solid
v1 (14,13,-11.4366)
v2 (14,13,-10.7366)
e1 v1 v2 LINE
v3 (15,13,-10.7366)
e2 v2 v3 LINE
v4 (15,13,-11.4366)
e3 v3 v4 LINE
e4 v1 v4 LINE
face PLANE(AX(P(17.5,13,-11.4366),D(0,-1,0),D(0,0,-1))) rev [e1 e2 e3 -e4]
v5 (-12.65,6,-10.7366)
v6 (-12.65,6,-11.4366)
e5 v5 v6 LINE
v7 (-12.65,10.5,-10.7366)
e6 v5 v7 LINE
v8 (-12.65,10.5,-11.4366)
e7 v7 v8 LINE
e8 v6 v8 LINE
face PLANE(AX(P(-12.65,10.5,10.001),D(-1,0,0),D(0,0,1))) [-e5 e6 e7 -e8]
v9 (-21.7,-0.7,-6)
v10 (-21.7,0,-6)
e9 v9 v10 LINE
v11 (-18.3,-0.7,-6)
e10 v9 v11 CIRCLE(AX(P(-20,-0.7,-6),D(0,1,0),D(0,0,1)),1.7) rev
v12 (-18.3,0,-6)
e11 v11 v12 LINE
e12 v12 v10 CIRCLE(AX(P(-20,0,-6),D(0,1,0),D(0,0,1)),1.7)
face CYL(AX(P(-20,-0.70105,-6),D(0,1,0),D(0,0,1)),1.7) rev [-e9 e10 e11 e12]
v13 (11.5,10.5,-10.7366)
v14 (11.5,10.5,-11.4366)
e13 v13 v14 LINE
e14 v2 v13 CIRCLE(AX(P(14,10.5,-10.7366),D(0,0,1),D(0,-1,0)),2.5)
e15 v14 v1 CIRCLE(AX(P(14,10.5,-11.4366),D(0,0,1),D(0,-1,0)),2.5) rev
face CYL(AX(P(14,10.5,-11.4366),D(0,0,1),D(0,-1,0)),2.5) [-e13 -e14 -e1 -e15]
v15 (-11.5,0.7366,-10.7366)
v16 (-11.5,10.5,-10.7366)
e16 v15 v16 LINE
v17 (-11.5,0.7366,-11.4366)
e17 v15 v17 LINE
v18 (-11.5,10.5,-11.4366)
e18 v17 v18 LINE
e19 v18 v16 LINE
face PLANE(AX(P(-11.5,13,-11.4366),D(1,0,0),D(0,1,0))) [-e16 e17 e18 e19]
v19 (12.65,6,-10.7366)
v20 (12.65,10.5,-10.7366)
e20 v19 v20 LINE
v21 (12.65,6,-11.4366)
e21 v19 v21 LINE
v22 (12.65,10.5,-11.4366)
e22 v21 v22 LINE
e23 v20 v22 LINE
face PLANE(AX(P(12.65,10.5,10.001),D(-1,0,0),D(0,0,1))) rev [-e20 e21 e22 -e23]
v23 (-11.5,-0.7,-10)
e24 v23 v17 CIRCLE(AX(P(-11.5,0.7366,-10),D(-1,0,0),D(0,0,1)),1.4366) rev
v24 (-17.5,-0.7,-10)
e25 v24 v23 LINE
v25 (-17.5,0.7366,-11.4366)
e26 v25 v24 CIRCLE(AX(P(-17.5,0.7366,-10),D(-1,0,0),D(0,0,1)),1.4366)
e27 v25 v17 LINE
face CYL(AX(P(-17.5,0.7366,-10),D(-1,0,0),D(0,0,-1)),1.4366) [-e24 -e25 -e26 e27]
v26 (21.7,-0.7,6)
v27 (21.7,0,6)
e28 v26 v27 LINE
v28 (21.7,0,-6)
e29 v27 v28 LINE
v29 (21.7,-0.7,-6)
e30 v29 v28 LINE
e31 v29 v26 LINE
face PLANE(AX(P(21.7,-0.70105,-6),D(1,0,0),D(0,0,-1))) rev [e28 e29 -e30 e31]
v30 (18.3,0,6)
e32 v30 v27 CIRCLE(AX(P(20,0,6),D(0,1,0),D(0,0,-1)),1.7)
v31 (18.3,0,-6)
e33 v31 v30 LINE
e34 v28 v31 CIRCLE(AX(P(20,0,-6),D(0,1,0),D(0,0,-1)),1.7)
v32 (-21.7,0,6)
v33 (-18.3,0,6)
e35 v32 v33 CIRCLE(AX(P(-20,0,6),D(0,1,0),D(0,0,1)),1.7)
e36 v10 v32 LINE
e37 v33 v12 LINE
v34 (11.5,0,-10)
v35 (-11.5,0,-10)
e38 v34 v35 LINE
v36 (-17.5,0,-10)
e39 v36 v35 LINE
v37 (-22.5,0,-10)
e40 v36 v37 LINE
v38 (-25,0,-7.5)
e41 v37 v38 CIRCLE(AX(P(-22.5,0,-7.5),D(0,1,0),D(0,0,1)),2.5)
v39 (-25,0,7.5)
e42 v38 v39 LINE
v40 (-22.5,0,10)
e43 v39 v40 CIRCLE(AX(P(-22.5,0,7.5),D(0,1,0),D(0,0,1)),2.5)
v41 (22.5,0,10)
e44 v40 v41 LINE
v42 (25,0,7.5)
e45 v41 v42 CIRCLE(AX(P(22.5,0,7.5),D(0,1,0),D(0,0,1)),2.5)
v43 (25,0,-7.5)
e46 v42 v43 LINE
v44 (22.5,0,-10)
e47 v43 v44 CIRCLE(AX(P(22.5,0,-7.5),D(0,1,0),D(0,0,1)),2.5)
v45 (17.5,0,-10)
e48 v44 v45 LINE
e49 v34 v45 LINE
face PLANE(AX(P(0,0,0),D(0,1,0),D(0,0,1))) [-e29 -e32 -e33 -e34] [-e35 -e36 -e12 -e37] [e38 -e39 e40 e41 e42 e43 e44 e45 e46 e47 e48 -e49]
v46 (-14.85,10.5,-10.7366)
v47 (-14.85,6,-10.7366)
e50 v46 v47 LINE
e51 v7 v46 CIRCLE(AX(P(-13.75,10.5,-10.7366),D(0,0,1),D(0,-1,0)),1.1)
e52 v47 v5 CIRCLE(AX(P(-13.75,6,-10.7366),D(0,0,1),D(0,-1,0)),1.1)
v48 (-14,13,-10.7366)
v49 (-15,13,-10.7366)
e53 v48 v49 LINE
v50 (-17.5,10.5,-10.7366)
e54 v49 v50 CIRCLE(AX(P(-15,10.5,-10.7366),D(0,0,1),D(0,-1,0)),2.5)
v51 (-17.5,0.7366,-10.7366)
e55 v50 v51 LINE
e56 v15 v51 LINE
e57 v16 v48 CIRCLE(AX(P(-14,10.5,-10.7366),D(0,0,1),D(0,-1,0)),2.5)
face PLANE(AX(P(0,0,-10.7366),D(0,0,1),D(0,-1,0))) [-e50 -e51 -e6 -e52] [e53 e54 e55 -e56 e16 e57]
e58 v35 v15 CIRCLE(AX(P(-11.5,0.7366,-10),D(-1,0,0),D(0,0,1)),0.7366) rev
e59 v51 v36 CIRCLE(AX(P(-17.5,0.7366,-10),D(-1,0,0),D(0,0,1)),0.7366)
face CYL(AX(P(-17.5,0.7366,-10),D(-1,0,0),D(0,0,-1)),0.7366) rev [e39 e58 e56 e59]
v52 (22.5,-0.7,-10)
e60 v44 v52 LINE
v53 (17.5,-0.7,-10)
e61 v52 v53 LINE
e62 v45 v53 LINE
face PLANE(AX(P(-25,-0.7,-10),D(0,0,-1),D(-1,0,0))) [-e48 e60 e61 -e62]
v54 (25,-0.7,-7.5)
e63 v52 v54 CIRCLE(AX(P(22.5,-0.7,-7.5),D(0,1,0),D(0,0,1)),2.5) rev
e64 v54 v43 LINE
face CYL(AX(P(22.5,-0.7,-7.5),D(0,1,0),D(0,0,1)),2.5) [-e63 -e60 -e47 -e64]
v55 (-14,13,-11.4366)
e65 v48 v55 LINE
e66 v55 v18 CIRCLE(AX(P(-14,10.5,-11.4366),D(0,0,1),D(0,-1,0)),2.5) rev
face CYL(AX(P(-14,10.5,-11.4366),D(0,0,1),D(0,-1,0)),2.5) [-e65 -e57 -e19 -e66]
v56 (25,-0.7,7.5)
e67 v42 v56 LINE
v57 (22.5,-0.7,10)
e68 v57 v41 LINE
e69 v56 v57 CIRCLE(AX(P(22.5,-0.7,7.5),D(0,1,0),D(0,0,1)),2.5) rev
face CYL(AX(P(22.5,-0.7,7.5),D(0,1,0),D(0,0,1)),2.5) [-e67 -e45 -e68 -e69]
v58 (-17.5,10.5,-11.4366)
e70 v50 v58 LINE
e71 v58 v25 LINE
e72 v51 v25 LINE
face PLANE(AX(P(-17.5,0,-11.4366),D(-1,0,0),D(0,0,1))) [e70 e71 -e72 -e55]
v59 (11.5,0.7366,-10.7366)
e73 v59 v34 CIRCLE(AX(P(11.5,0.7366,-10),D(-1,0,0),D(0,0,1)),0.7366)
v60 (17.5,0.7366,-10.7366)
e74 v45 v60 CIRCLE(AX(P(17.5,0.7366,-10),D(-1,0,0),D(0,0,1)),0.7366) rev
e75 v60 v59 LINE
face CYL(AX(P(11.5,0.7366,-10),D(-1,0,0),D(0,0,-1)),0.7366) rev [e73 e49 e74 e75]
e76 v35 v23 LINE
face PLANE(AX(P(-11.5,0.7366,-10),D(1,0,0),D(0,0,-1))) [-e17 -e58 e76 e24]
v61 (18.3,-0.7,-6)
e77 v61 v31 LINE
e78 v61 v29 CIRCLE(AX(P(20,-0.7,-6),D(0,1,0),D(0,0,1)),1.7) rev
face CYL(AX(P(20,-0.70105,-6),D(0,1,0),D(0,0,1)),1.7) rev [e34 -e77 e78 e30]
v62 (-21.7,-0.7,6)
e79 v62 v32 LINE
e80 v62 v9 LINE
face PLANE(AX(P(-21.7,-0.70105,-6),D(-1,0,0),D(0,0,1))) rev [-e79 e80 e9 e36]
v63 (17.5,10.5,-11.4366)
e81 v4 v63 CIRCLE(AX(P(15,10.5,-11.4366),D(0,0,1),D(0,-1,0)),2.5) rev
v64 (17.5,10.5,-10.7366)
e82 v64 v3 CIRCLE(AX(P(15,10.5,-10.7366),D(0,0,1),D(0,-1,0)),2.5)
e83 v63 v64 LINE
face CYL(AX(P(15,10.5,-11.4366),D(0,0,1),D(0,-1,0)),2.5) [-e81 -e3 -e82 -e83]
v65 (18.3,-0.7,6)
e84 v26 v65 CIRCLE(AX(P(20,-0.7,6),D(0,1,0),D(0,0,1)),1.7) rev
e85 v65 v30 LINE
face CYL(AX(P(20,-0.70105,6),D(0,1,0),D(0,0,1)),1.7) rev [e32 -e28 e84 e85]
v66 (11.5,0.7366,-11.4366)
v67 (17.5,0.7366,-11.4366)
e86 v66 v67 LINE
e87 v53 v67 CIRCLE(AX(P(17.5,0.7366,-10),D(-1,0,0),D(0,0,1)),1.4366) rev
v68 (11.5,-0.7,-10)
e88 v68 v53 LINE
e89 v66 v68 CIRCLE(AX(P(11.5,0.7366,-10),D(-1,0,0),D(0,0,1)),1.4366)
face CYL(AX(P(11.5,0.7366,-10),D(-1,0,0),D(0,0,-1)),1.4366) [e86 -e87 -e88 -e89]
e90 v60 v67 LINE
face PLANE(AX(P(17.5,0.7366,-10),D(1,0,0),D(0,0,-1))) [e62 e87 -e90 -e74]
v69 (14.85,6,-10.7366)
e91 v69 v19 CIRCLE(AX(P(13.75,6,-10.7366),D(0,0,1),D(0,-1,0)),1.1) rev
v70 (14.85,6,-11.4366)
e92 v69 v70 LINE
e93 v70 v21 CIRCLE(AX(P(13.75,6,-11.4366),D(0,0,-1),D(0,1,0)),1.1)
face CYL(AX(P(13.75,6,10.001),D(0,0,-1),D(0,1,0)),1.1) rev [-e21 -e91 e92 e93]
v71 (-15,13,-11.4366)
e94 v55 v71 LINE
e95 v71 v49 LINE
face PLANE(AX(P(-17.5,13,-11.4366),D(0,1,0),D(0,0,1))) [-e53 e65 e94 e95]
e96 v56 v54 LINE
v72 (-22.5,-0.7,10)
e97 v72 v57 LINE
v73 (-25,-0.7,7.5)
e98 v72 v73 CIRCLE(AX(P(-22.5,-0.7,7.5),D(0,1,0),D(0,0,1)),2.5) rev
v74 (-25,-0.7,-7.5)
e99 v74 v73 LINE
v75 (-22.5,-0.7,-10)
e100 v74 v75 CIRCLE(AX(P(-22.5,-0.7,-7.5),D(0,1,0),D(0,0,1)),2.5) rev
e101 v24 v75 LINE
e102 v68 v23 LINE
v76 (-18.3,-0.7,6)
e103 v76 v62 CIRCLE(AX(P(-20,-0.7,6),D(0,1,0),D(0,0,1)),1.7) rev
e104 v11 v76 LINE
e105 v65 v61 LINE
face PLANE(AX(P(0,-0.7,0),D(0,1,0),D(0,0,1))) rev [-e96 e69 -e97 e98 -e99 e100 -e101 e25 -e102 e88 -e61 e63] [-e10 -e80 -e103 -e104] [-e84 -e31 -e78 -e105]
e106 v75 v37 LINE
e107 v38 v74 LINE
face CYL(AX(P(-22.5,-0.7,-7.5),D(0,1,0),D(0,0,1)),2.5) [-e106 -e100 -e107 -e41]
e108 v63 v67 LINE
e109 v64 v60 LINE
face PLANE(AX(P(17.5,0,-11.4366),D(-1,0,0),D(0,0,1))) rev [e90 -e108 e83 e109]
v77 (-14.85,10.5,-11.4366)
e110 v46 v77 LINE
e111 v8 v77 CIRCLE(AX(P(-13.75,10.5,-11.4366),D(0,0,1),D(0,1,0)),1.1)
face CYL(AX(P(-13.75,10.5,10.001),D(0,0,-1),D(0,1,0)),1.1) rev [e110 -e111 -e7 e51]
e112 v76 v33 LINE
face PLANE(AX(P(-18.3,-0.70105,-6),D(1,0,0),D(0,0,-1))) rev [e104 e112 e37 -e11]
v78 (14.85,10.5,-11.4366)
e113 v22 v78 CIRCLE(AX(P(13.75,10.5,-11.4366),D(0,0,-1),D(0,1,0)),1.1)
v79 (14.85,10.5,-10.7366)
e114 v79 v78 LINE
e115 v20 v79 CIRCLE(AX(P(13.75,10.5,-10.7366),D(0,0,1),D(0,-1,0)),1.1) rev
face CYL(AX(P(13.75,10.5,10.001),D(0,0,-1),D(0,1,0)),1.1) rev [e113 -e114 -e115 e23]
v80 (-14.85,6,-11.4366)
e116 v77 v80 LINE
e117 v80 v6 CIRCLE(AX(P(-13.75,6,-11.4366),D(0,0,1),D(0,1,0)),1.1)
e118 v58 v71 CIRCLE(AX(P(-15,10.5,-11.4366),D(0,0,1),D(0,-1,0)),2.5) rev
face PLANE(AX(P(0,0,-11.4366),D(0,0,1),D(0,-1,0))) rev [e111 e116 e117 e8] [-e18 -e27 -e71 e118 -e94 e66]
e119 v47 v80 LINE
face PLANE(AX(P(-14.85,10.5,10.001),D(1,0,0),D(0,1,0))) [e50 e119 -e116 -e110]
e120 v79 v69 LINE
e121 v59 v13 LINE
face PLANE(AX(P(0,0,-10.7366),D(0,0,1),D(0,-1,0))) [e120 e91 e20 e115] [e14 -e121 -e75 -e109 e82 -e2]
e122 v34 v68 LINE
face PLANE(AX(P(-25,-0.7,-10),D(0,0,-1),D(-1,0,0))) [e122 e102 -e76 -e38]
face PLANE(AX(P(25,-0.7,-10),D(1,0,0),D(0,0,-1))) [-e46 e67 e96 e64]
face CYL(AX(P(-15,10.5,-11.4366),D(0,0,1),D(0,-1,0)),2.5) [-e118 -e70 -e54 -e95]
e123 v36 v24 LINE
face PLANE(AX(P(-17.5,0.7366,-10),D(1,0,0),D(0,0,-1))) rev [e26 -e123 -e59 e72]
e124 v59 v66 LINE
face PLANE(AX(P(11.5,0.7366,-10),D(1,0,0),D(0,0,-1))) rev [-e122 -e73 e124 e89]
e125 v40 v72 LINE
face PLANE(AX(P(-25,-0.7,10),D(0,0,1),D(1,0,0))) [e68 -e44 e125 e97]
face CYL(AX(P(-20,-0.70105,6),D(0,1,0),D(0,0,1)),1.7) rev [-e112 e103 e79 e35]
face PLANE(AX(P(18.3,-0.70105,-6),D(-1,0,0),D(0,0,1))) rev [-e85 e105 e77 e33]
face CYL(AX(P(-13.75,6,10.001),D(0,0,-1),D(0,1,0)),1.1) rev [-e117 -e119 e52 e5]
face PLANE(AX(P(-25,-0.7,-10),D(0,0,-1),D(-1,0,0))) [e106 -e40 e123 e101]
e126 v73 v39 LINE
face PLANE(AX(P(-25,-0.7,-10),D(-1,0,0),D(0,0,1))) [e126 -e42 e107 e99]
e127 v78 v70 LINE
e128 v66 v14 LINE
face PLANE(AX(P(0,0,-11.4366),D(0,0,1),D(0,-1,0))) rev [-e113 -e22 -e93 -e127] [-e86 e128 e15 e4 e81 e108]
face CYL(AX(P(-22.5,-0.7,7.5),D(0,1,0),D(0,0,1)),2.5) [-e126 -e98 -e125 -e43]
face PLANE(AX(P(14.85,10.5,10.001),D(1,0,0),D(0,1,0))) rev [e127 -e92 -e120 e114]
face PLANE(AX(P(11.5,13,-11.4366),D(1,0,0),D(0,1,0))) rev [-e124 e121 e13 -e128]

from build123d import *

# Parameters (mm, degrees)
SKETCH1_W             = 50
SKETCH1_H             = 20
BASE_FLANGE1_DEPTH    = 0.7
EDGE_FLANGE1_DEPTH    = 6
CUT_EXTRUDE1_REACH    = 37.405
BREAK_CORNER1_START   = -12
BREAK_CORNER1_DEPTH   = 2
BREAK_CORNER1_START_2 = -2
BREAK_CORNER1_2_DEPTH = 3
CUT_EXTRUDE2_REACH    = 32.41


with BuildPart() as part:
    # Base-Flange1: sheet metal written as solids
    # Sketch1 → Base-Flange1 (new body)
    with BuildSketch(Plane(origin=(0, 0, 0), x_dir=(1, 0, 0), z_dir=(0, 1, 0))):
        Rectangle(SKETCH1_W, SKETCH1_H)
    extrude(amount=-BASE_FLANGE1_DEPTH)

    # Edge-Flange1: sheet metal written as solids
    # Edge-Flange1 section (on a plane across the edge) → Edge-Flange1 (add)
    with BuildSketch(Plane(origin=(17.5, 0, -10.7366), x_dir=(0, 0, 1), z_dir=(-1, 0, 0))):
        with BuildLine():
            Line((-0.7, 0.7366), (-0.7, 13))
            Line((-0.7, 13), (0, 13))
            Line((0, 13), (0, 0.7366))
            ThreePointArc((0, 0.7366), (0.215745145, 0.215745145), (0.7366, 0))
            Line((0.7366, 0), (0.7366, -0.7))
            ThreePointArc((0.7366, -0.7), (-0.279229602, -0.279229602), (-0.7, 0.7366))
        make_face()
    edge_flange1 = extrude(amount=EDGE_FLANGE1_DEPTH)

    # Sketch7 → Cut-Extrude1 (cut, up to next)
    with BuildSketch(Plane(origin=(0, 0, -11.4366), x_dir=(-1, 0, 0), z_dir=(0, 0, -1)), mode=Mode.PRIVATE) as cut_extrude1_sk1:
        with BuildLine():
            Line((-12.65, 10.5), (-12.65, 6))
            ThreePointArc((-12.65, 6), (-13.75, 4.9), (-14.85, 6))
            Line((-14.85, 6), (-14.85, 10.5))
            ThreePointArc((-14.85, 10.5), (-13.75, 11.6), (-12.65, 10.5))
        make_face()
    cut_extrude1_tool1 = extrude(cut_extrude1_sk1.sketch, amount=-CUT_EXTRUDE1_REACH, mode=Mode.PRIVATE) & part.part
    cut_extrude1 = cut_extrude1_tool1.solids().sort_by_distance((13.75, 8.25, -11.4366))[0]
    add(cut_extrude1, mode=Mode.SUBTRACT)

    # Mirror1: Edge-Flange1, Cut-Extrude1 across plane
    add(edge_flange1.mirror(Plane(origin=(0, 0, 0), x_dir=(0, 0, 1), z_dir=(1, 0, 0))))
    add(cut_extrude1.mirror(Plane(origin=(0, 0, 0), x_dir=(0, 0, 1), z_dir=(1, 0, 0))), mode=Mode.SUBTRACT)

    # Break-Corner1: read off the stored shape, not the designer's step
    # Break-Corner1 outline → Break-Corner1 (cut)
    with BuildSketch(Plane.XY.offset(BREAK_CORNER1_START)):
        with BuildLine():
            ThreePointArc((-17.5, 10.5), (-16.767766953, 12.267766953), (-15, 13))
            Line((-15, 13), (-17.5, 13))
            Line((-17.5, 13), (-17.5, 10.5))
        make_face()
        with BuildLine():
            ThreePointArc((-14, 13), (-12.232233047, 12.267766953), (-11.5, 10.5))
            Line((-11.5, 10.5), (-11.5, 13))
            Line((-11.5, 13), (-14, 13))
        make_face()
        with BuildLine():
            ThreePointArc((11.5, 10.5), (12.232233047, 12.267766953), (14, 13))
            Line((14, 13), (11.5, 13))
            Line((11.5, 13), (11.5, 10.5))
        make_face()
        with BuildLine():
            ThreePointArc((15, 13), (16.767766953, 12.267766953), (17.5, 10.5))
            Line((17.5, 10.5), (17.5, 13))
            Line((17.5, 13), (15, 13))
        make_face()
    extrude(amount=BREAK_CORNER1_DEPTH, mode=Mode.SUBTRACT)

    # Break-Corner1 2 outline → Break-Corner1 2 (cut)
    with BuildSketch(Plane(origin=(0, 0, 0), x_dir=(1, 0, 0), z_dir=(0, 1, 0)).offset(BREAK_CORNER1_START_2)):
        with BuildLine():
            ThreePointArc((22.5, 10), (24.267766953, 9.267766953), (25, 7.5))
            Line((25, 7.5), (25, 10))
            Line((25, 10), (22.5, 10))
        make_face()
        with BuildLine():
            Line((-25, 10), (-25, 7.5))
            ThreePointArc((-25, 7.5), (-24.267766953, 9.267766953), (-22.5, 10))
            Line((-22.5, 10), (-25, 10))
        make_face()
        with BuildLine():
            Line((-25, -10), (-22.5, -10))
            ThreePointArc((-22.5, -10), (-24.267766953, -9.267766953), (-25, -7.5))
            Line((-25, -7.5), (-25, -10))
        make_face()
        with BuildLine():
            ThreePointArc((25, -7.5), (24.267766953, -9.267766953), (22.5, -10))
            Line((22.5, -10), (25, -10))
            Line((25, -10), (25, -7.5))
        make_face()
    extrude(amount=BREAK_CORNER1_2_DEPTH, mode=Mode.SUBTRACT)

    # Sketch8 → Cut-Extrude2 (cut, up to next)
    with BuildSketch(Plane(origin=(0, 0, 0), x_dir=(1, 0, 0), z_dir=(0, 1, 0)), mode=Mode.PRIVATE) as cut_extrude2_sk1:
        with BuildLine():
            Line((-18.3, 6), (-18.3, -6))
            ThreePointArc((-18.3, -6), (-20, -7.7), (-21.7, -6))
            Line((-21.7, -6), (-21.7, 6))
            ThreePointArc((-21.7, 6), (-20, 7.7), (-18.3, 6))
        make_face()
    cut_extrude2_tool1 = extrude(cut_extrude2_sk1.sketch, amount=-CUT_EXTRUDE2_REACH, mode=Mode.PRIVATE) & part.part
    # Sketch8 → Cut-Extrude2 (cut, up to next)
    with BuildSketch(Plane(origin=(0, 0, 0), x_dir=(1, 0, 0), z_dir=(0, 1, 0)), mode=Mode.PRIVATE) as cut_extrude2_sk2:
        with BuildLine():
            Line((18.3, 6), (18.3, -6))
            ThreePointArc((18.3, -6), (20, -7.7), (21.7, -6))
            Line((21.7, -6), (21.7, 6))
            ThreePointArc((21.7, 6), (20, 7.7), (18.3, 6))
        make_face()
    cut_extrude2_tool2 = extrude(cut_extrude2_sk2.sketch, amount=-CUT_EXTRUDE2_REACH, mode=Mode.PRIVATE) & part.part
    add(cut_extrude2_tool1.solids().sort_by_distance((-20, 0, 0))[0], mode=Mode.SUBTRACT)
    add(cut_extrude2_tool2.solids().sort_by_distance((20, 0, 0))[0], mode=Mode.SUBTRACT)


solid = part.part
